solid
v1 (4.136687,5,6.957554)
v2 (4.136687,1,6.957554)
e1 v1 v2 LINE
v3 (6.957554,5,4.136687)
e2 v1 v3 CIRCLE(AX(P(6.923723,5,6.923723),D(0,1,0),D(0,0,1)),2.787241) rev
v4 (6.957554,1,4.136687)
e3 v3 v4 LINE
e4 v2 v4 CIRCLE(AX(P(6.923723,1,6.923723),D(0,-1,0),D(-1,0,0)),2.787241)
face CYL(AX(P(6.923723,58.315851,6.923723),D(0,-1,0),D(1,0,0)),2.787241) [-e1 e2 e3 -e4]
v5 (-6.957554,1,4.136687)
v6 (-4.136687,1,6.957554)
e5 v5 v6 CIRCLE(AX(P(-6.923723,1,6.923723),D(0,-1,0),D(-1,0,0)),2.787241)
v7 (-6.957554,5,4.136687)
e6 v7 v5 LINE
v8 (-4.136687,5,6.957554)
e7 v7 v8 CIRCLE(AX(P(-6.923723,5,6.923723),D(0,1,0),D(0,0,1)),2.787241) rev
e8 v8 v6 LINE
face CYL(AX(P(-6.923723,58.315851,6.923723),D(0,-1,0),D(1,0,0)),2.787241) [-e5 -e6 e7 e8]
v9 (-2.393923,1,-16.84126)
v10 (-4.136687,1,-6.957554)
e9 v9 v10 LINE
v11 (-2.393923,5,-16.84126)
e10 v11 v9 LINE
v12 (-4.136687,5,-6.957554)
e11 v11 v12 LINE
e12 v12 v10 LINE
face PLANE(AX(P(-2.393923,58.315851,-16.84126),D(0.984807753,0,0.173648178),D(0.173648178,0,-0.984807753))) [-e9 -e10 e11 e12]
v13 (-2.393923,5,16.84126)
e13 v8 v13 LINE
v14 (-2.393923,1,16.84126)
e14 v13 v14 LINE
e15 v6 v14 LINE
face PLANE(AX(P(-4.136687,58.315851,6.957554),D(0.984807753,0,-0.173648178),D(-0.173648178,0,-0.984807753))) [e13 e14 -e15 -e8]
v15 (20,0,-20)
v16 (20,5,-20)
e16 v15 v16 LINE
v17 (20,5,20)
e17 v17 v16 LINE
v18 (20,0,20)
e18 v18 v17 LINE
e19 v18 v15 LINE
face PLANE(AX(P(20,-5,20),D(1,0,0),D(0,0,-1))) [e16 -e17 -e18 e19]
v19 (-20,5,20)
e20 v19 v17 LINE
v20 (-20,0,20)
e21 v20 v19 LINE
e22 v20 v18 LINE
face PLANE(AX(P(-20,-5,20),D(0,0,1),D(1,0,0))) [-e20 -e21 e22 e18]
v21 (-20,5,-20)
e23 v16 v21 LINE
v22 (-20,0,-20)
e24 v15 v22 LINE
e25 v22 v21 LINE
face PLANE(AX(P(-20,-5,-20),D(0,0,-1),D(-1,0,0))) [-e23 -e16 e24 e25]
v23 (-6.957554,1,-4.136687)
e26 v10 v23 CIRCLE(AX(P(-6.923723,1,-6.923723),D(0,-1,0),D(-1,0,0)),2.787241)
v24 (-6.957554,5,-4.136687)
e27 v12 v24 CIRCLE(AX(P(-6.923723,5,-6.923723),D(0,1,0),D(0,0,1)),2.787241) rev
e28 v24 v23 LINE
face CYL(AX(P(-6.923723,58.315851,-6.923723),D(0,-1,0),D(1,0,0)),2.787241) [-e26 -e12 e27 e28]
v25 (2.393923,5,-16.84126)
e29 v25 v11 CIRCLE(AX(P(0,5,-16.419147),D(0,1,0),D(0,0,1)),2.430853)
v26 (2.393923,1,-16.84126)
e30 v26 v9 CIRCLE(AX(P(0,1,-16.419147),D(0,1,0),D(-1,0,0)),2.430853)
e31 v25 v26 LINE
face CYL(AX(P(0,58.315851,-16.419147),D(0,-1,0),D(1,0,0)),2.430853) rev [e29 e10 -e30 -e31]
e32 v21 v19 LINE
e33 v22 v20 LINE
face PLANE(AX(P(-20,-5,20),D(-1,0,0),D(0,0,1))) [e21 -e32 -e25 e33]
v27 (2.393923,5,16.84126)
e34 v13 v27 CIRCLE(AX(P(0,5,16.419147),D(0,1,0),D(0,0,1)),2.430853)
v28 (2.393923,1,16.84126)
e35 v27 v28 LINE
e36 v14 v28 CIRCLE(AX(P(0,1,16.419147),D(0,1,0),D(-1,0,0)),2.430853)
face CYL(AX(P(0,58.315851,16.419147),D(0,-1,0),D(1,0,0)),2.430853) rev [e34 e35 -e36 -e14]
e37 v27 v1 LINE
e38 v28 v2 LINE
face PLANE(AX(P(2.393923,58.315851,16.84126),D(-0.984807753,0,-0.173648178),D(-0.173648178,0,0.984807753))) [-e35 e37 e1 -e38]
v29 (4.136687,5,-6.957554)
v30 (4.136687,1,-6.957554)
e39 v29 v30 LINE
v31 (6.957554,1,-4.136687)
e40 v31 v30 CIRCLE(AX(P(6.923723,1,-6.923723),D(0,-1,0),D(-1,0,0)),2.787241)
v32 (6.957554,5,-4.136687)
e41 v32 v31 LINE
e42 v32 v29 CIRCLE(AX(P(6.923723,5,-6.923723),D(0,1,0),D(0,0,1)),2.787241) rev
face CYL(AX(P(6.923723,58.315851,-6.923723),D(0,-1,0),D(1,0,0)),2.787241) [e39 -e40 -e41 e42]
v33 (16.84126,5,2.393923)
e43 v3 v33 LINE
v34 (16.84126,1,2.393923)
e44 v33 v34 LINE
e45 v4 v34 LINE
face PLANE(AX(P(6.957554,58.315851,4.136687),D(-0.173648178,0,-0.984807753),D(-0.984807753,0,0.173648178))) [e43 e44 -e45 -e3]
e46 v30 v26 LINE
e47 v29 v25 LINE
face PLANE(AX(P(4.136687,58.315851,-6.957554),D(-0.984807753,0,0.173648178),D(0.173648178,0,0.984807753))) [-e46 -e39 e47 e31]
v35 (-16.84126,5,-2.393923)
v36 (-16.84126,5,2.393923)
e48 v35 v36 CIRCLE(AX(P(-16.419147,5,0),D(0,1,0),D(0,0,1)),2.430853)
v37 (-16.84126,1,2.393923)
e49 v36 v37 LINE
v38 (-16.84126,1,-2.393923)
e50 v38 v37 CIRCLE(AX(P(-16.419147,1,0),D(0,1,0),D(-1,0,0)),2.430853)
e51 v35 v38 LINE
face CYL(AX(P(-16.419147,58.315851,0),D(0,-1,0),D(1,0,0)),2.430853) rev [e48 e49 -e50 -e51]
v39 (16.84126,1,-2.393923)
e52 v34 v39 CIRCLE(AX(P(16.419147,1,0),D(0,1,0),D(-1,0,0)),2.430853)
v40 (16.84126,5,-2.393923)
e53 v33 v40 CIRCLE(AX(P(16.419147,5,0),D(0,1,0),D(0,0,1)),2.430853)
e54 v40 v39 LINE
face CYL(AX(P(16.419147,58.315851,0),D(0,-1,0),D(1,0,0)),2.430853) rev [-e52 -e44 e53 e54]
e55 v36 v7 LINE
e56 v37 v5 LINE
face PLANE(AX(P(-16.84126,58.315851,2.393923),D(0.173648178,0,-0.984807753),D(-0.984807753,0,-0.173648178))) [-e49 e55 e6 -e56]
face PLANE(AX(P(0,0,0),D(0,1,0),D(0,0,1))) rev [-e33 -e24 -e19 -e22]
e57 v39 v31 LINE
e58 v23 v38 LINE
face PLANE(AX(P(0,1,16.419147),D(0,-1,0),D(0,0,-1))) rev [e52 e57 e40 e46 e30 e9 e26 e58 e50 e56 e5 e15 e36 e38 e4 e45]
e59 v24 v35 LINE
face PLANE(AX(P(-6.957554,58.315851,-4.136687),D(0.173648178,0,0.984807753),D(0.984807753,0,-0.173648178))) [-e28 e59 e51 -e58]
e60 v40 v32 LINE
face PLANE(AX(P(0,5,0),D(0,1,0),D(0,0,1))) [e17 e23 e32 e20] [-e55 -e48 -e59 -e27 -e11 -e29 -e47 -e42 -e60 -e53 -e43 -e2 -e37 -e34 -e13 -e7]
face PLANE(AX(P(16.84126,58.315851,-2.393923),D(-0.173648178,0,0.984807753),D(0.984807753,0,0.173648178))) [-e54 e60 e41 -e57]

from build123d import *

# Parameters (mm, degrees)
SKETCH1_R             = 50
BOSS_EXTRUDE1_DEPTH   = 5
CAVITY1_START         = 1
CAVITY1_OUTLINE_R     = 4.45
CAVITY1_OUTLINE_R_2   = 3.45
CAVITY1_OUTLINE_R_3   = 2.9
CAVITY1_DEPTH         = 2.65
CAVITY1_START_2       = 2
CAVITY1_2_OUTLINE_R   = 4.45
CAVITY1_2_OUTLINE_R_2 = 3.45
CAVITY1_2_OUTLINE_R_3 = 2.9
CAVITY1_2_OUTLINE_R_4 = 1.5
CAVITY1_2_DEPTH       = 1.65
CAVITY1_START_3       = 3.65
CAVITY1_3_OUTLINE_R   = 4.25
CAVITY1_3_OUTLINE_R_2 = 3
CAVITY1_3_DEPTH       = 1.35
CUT_EXTRUDE4_DEPTH    = 4
CUT_EXTRUDE5_START    = -10
SKETCH4_R             = 50
SKETCH4_W             = 40
SKETCH4_H             = 40
CUT_EXTRUDE5_DEPTH    = 10


# Read off the part's stored shape, not the designer's step: Cavity1
with BuildPart() as part:
    # Sketch1 → Boss-Extrude1 (new body)
    with BuildSketch(Plane(origin=(0, 0, 0), x_dir=(1, 0, 0), z_dir=(0, 1, 0))):
        with Locations(Location((0, 0, 0), (0, 0, 270))):
            Circle(SKETCH1_R)
    extrude(amount=BOSS_EXTRUDE1_DEPTH)

    # Cavity1 outline → Cavity1 (cut)
    # profile 1 of 2: a face of its own
    with BuildSketch(Plane(origin=(0, 0, 0), x_dir=(1, 0, 0), z_dir=(0, 1, 0)).offset(CAVITY1_START)):
        with BuildLine():
            Line((-3.736481777, -6.923723208), (-2, -16.771800738))
            ThreePointArc((-2, -16.771800738), (0, -18.45), (2, -16.771800738))
            Line((2, -16.771800738), (3.736481777, -6.923723208))
            ThreePointArc((3.736481777, -6.923723208), (4.670003178, -4.670003178), (6.923723208, -3.736481777))
            Line((6.923723208, -3.736481777), (16.771800738, -2))
            ThreePointArc((16.771800738, -2), (18.45, 0), (16.771800738, 2))
            Line((16.771800738, 2), (6.923723208, 3.736481777))
            ThreePointArc((6.923723208, 3.736481777), (4.670003178, 4.670003178), (3.736481777, 6.923723208))
            Line((3.736481777, 6.923723208), (2, 16.771800738))
            ThreePointArc((2, 16.771800738), (0, 18.45), (-2, 16.771800738))
            Line((-2, 16.771800738), (-3.736481777, 6.923723208))
            ThreePointArc((-3.736481777, 6.923723208), (-4.670003178, 4.670003178), (-6.923723208, 3.736481777))
            Line((-6.923723208, 3.736481777), (-16.771800738, 2))
            ThreePointArc((-16.771800738, 2), (-18.45, 0), (-16.771800738, -2))
            Line((-16.771800738, -2), (-6.923723208, -3.736481777))
            ThreePointArc((-6.923723208, -3.736481777), (-4.670003178, -4.670003178), (-3.736481777, -6.923723208))
        make_face()
        Circle(CAVITY1_OUTLINE_R, mode=Mode.SUBTRACT)
    # profile 2 of 2: a face of its own
    with BuildSketch(Plane(origin=(0, 0, 0), x_dir=(1, 0, 0), z_dir=(0, 1, 0)).offset(CAVITY1_START)):
        Circle(CAVITY1_OUTLINE_R_2)
        Circle(CAVITY1_OUTLINE_R_3, mode=Mode.SUBTRACT)
    extrude(amount=CAVITY1_DEPTH, mode=Mode.SUBTRACT)

    # Cavity1 2 outline → Cavity1 2 (cut)
    # profile 1 of 2: a face of its own
    with BuildSketch(Plane(origin=(0, 0, 0), x_dir=(1, 0, 0), z_dir=(0, 1, 0)).offset(CAVITY1_START_2)):
        Circle(CAVITY1_2_OUTLINE_R)
        Circle(CAVITY1_2_OUTLINE_R_2, mode=Mode.SUBTRACT)
    # profile 2 of 2: a face of its own
    with BuildSketch(Plane(origin=(0, 0, 0), x_dir=(1, 0, 0), z_dir=(0, 1, 0)).offset(CAVITY1_START_2)):
        Circle(CAVITY1_2_OUTLINE_R_3)
        Circle(CAVITY1_2_OUTLINE_R_4, mode=Mode.SUBTRACT)
    extrude(amount=CAVITY1_2_DEPTH, mode=Mode.SUBTRACT)

    # Cavity1 3 outline → Cavity1 3 (cut)
    with BuildSketch(Plane(origin=(0, 0, 0), x_dir=(1, 0, 0), z_dir=(0, 1, 0)).offset(CAVITY1_START_3)):
        Circle(CAVITY1_3_OUTLINE_R)
        Circle(CAVITY1_3_OUTLINE_R_2, mode=Mode.SUBTRACT)
    extrude(amount=CAVITY1_3_DEPTH, mode=Mode.SUBTRACT)

    # Sketch2 → Cut-Extrude4 (cut)
    with BuildSketch(Plane(origin=(0, 1, 0), x_dir=(1, 0, 0), z_dir=(0, 1, 0))):
        with BuildLine():
            Line((-6.957554218, 4.136687101), (-16.841260009, 2.393923101))
            ThreePointArc((-16.841260009, 2.393923101), (-18.85, 0), (-16.841260009, -2.393923101))
            Line((-16.841260009, -2.393923101), (-6.957554218, -4.136687101))
            ThreePointArc((-6.957554218, -4.136687101), (-4.952845891, -4.952845891), (-4.136687101, -6.957554218))
            Line((-4.136687101, -6.957554218), (-2.393923101, -16.841260009))
            ThreePointArc((-2.393923101, -16.841260009), (0, -18.85), (2.393923101, -16.841260009))
            Line((2.393923101, -16.841260009), (4.136687101, -6.957554218))
            ThreePointArc((4.136687101, -6.957554218), (4.952845891, -4.952845891), (6.957554218, -4.136687101))
            Line((6.957554218, -4.136687101), (16.841260009, -2.393923101))
            ThreePointArc((16.841260009, -2.393923101), (18.85, 0), (16.841260009, 2.393923101))
            Line((16.841260009, 2.393923101), (6.957554218, 4.136687101))
            ThreePointArc((6.957554218, 4.136687101), (4.952845891, 4.952845891), (4.136687101, 6.957554218))
            Line((4.136687101, 6.957554218), (2.393923101, 16.841260009))
            ThreePointArc((2.393923101, 16.841260009), (0, 18.85), (-2.393923101, 16.841260009))
            Line((-2.393923101, 16.841260009), (-4.136687101, 6.957554218))
            ThreePointArc((-4.136687101, 6.957554218), (-4.952845891, 4.952845891), (-6.957554218, 4.136687101))
        make_face()
    extrude(amount=CUT_EXTRUDE4_DEPTH, mode=Mode.SUBTRACT)

    # Sketch4 → Cut-Extrude5 (cut)
    with BuildSketch(Plane(origin=(0, 5, 0), x_dir=(1, 0, 0), z_dir=(0, 1, 0)).offset(CUT_EXTRUDE5_START)):
        Circle(SKETCH4_R)
        Rectangle(SKETCH4_W, SKETCH4_H, mode=Mode.SUBTRACT)
    extrude(amount=CUT_EXTRUDE5_DEPTH, mode=Mode.SUBTRACT)


solid = part.part
